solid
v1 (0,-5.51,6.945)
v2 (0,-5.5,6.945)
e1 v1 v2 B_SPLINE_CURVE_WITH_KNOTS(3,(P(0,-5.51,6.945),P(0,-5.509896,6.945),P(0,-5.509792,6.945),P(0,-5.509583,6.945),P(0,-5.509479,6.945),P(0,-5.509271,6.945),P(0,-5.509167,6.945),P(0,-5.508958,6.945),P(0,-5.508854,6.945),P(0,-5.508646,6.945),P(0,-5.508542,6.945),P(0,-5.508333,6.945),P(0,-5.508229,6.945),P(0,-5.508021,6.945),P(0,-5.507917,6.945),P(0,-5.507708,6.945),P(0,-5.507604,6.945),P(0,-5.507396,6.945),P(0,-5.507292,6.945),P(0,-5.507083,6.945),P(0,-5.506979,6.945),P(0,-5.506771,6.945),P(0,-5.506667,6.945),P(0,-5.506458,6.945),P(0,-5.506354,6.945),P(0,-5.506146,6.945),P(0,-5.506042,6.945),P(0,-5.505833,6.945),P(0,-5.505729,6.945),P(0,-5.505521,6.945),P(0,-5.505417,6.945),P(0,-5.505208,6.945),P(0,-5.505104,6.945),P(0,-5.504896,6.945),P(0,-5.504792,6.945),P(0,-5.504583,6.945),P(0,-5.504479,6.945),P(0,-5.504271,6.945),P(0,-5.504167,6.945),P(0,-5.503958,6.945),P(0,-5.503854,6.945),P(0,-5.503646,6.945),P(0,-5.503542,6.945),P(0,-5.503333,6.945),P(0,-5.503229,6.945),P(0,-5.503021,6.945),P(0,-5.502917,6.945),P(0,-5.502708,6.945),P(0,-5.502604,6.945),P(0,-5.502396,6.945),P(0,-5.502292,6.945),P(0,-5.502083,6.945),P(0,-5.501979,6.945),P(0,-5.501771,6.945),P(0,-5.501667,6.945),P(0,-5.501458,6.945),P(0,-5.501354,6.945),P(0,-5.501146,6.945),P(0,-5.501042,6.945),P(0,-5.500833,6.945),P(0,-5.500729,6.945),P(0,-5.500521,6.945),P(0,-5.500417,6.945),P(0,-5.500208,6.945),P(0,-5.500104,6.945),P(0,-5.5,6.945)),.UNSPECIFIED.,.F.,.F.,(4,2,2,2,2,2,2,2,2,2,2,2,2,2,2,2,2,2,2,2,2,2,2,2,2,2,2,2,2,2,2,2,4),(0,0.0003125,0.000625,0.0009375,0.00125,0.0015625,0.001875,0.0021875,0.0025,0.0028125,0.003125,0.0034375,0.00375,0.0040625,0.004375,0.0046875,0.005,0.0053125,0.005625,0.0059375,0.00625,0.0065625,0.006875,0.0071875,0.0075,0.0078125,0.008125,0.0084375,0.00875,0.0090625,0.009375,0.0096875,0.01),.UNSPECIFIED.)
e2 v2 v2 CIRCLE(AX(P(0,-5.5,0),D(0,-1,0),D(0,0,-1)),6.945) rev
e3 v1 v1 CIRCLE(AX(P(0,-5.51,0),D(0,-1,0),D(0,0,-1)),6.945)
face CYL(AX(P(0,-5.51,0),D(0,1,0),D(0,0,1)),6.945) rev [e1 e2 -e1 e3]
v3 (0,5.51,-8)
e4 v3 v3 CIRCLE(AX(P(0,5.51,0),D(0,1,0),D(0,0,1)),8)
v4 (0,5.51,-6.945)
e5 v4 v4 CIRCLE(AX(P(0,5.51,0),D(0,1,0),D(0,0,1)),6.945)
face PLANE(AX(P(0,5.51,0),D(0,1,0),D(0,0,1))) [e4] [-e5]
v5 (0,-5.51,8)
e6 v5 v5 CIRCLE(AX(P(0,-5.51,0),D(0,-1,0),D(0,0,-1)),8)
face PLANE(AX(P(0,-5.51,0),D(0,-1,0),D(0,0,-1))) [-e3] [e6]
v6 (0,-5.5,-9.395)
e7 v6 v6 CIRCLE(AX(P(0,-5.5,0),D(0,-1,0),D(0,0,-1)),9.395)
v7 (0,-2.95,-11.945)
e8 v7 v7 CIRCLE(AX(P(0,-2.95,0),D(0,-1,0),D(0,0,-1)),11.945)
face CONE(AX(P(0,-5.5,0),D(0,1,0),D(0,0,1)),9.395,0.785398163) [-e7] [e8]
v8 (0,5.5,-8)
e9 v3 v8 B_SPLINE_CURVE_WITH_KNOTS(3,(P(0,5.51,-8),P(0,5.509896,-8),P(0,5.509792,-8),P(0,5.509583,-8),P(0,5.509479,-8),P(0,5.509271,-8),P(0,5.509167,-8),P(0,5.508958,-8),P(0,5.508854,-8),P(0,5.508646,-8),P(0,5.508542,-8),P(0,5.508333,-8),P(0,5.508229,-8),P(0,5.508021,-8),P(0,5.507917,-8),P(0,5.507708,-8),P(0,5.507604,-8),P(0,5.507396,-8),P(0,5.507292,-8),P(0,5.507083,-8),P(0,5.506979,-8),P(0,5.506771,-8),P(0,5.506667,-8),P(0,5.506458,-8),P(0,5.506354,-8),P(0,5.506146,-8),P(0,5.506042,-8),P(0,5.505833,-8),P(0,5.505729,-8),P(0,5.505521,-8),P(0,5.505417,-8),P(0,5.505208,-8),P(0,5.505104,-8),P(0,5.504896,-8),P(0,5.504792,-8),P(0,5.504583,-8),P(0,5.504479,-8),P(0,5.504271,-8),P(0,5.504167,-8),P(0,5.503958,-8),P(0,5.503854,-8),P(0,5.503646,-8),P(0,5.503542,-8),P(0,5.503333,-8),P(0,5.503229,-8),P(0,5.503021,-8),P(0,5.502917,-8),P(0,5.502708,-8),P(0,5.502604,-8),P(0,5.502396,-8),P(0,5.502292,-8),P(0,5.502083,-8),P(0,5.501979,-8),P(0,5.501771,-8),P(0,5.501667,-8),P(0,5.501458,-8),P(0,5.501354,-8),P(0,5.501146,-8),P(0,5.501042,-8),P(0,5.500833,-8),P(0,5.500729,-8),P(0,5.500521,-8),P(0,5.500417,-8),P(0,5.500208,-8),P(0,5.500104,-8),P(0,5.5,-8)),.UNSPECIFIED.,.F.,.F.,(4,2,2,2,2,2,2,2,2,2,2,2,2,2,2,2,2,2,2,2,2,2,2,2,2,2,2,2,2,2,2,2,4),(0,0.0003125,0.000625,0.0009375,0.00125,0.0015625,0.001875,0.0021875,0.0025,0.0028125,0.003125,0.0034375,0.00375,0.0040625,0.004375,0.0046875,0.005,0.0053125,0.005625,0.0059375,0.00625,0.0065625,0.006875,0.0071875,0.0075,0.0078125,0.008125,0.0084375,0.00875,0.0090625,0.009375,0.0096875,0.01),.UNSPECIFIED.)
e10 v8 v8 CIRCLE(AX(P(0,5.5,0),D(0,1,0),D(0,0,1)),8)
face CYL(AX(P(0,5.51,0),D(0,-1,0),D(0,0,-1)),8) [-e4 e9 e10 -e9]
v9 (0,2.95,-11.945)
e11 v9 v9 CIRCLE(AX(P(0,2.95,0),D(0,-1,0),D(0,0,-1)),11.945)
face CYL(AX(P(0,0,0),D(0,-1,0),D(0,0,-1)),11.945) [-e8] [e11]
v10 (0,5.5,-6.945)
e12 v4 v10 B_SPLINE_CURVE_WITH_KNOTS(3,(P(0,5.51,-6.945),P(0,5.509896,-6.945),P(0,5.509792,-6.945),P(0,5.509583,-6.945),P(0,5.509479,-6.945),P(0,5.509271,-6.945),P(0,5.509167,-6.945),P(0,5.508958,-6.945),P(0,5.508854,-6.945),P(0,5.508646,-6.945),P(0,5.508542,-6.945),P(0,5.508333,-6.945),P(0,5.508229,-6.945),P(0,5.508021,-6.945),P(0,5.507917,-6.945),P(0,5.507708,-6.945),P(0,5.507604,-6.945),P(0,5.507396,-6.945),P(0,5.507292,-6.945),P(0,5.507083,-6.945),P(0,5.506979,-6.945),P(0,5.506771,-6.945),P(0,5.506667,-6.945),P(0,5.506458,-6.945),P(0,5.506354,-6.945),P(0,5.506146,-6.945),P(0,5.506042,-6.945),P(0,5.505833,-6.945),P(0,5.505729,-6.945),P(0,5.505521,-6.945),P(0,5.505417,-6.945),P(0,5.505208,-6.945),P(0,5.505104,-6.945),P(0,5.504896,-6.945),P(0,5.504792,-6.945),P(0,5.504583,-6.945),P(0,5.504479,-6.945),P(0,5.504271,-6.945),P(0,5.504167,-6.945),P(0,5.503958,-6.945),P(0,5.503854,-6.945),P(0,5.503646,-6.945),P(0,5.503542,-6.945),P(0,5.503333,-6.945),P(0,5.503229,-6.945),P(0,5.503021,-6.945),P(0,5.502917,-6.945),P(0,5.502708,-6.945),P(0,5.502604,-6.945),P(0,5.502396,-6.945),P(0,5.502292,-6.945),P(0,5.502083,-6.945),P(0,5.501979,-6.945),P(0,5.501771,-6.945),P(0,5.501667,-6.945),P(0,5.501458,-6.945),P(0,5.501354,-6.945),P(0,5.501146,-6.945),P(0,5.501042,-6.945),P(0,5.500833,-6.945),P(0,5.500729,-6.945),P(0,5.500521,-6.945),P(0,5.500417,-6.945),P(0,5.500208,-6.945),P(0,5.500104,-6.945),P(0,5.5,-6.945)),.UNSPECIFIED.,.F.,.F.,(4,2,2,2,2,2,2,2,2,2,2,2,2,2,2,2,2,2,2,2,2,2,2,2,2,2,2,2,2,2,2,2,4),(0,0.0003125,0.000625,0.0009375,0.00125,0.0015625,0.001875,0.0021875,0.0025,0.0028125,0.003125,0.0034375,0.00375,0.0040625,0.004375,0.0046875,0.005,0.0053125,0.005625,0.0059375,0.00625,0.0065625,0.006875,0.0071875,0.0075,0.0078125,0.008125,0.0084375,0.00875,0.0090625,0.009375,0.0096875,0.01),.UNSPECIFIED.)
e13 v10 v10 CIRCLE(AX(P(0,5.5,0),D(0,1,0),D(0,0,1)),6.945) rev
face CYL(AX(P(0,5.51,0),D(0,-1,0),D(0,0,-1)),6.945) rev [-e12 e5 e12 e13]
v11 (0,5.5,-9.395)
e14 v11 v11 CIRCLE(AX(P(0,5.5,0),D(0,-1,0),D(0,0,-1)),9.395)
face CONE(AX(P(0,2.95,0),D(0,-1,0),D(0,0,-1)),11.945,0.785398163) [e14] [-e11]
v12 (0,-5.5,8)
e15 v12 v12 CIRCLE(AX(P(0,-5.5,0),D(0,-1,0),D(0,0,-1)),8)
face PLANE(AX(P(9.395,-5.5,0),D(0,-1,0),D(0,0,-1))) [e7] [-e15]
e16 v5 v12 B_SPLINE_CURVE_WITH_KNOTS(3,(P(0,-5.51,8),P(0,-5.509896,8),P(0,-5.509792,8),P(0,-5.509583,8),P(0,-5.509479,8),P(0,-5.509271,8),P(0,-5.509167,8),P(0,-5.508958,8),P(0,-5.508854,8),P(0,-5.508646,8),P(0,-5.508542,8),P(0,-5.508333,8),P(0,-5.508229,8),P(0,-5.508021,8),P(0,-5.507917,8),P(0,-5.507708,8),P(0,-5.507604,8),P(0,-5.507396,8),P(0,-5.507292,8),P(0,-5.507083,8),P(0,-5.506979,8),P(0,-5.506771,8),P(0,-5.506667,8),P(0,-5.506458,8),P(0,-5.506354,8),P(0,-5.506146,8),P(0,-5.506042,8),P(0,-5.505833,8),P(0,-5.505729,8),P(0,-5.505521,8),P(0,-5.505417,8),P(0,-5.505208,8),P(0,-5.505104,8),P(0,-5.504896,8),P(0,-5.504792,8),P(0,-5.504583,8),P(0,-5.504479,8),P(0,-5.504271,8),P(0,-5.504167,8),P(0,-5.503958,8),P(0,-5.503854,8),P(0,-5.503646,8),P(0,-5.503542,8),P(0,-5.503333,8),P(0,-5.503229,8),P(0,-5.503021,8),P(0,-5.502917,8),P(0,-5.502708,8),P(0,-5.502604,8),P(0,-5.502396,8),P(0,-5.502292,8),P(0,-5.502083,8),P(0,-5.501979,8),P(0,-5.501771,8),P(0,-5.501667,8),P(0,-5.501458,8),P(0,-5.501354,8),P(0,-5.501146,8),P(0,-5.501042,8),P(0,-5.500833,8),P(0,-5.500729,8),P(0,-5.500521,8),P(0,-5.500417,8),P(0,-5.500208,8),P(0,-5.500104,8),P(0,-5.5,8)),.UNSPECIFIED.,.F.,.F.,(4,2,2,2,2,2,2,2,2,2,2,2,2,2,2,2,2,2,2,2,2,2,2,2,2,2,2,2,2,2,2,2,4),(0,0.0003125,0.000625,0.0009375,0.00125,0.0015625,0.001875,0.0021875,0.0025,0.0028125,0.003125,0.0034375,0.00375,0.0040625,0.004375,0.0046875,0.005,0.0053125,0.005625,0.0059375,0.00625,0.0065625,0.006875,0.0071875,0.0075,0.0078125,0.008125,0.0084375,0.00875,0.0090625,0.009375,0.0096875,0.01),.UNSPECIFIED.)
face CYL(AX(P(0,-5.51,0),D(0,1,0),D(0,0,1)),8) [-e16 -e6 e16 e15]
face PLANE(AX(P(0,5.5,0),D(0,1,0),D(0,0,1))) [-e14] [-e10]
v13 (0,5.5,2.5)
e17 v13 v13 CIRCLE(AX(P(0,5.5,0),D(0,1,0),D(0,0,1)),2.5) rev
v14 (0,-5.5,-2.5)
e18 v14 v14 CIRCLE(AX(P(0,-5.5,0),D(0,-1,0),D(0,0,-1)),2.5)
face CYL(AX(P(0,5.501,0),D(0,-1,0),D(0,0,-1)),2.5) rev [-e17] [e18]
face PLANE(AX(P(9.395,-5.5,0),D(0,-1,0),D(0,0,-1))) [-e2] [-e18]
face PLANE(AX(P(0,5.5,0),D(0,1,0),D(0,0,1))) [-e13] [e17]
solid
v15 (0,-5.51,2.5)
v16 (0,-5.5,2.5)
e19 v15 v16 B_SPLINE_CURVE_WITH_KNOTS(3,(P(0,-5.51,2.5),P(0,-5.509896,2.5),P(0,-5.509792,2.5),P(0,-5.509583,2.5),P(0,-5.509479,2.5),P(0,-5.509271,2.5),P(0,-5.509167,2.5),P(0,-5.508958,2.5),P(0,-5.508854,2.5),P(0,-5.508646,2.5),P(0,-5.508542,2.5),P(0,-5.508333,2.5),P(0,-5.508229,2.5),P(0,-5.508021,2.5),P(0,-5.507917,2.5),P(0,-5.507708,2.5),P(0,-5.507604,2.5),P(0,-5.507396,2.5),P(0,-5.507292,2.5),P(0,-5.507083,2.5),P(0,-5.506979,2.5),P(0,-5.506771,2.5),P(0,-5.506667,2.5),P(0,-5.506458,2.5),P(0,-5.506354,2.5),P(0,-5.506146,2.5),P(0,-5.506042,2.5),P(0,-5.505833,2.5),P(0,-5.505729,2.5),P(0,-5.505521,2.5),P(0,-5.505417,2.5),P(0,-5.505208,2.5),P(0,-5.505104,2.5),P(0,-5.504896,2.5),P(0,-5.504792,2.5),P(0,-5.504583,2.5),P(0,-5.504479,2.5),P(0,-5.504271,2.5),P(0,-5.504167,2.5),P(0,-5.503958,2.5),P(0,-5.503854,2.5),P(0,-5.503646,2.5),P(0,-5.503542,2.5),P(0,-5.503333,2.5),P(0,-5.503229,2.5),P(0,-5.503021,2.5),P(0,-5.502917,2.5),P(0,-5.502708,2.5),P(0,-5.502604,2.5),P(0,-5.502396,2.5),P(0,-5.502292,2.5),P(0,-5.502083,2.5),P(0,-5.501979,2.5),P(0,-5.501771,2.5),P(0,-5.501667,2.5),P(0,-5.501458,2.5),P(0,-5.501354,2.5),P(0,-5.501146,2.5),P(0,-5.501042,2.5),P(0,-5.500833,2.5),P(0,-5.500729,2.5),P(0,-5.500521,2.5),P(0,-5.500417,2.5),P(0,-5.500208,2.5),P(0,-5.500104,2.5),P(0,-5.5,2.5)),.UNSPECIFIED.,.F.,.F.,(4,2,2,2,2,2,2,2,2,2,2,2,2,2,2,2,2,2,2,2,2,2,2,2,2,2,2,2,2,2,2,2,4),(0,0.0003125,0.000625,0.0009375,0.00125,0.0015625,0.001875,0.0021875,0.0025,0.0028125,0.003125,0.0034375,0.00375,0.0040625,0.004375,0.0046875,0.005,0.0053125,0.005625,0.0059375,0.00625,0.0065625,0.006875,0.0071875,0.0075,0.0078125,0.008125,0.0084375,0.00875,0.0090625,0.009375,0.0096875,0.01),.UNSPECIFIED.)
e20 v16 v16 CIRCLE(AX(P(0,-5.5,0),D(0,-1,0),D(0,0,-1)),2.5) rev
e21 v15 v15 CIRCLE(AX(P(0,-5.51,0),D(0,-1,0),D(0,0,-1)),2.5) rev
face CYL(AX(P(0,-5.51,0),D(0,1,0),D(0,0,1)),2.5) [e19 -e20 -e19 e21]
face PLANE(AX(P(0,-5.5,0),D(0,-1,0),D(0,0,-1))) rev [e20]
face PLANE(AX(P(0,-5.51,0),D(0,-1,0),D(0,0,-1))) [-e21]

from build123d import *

# Parameters (mm, degrees)
CUT_EXTRUDE1_REACH  = 22.159
SKETCH2_R           = 2.5
SKETCH4_R           = 8
SKETCH4_R_2         = 6.945
BOSS_EXTRUDE1_DEPTH = 0.01
BOSS_EXTRUDE2_START = 0.01
SKETCH3_R           = 8
SKETCH3_R_2         = 6.945
SKETCH3_R_3         = 2.5
BOSS_EXTRUDE2_DEPTH = 0.01


with BuildPart() as part:
    # Sketch1 → Revolve1 (revolve)
    with BuildSketch(Plane.XY):
        Polygon((0, 5.5), (9.395, 5.5), (11.945, 2.95), (11.945, -2.95), (9.395, -5.5), (0, -5.5), align=None)
    revolve(axis=Axis((0, 0, 0), (0, 1, 0)))

    # Sketch2 → Cut-Extrude1 (cut, up to next)
    with BuildSketch(Plane(origin=(0, -5.5, 0), x_dir=(-1, 0, 0), z_dir=(0, -1, 0)), mode=Mode.PRIVATE) as cut_extrude1_sk1:
        Circle(SKETCH2_R)
    cut_extrude1_tool1 = extrude(cut_extrude1_sk1.sketch, amount=-CUT_EXTRUDE1_REACH, mode=Mode.PRIVATE) & part.part
    add(cut_extrude1_tool1.solids().sort_by_distance((0, -5.5, 0))[0], mode=Mode.SUBTRACT)

    # Sketch4 → Boss-Extrude1 (add)
    with BuildSketch(Plane(origin=(0, 5.5, 0), x_dir=(1, 0, 0), z_dir=(0, 1, 0))):
        Circle(SKETCH4_R)
        Circle(SKETCH4_R_2, mode=Mode.SUBTRACT)
    extrude(amount=BOSS_EXTRUDE1_DEPTH)

    # Sketch3 → Boss-Extrude2 (add)
    # profile 1 of 2: a face of its own
    with BuildSketch(Plane.XZ.offset(5.5).offset(BOSS_EXTRUDE2_START)):
        Circle(SKETCH3_R)
        Circle(SKETCH3_R_2, mode=Mode.SUBTRACT)
    # profile 2 of 2: a face of its own
    with BuildSketch(Plane.XZ.offset(5.5).offset(BOSS_EXTRUDE2_START)):
        Circle(SKETCH3_R_3)
    extrude(amount=-BOSS_EXTRUDE2_DEPTH)


with BuildPart() as boss_extrude2_piece_1:
    # of the separate pieces the step leaves, piece 1, a body of its own (boss_extrude2_pieces)
    add(part.part.solids().sort_by_distance((9.395, 5.5, 0))[0])


with BuildPart() as boss_extrude2_piece_2:
    # of the separate pieces the step leaves, piece 2, a body of its own (boss_extrude2_pieces)
    add(part.part.solids().sort_by_distance((2.5, -5.51, 0))[0])


solid = Compound([boss_extrude2_piece_1.part, boss_extrude2_piece_2.part])
